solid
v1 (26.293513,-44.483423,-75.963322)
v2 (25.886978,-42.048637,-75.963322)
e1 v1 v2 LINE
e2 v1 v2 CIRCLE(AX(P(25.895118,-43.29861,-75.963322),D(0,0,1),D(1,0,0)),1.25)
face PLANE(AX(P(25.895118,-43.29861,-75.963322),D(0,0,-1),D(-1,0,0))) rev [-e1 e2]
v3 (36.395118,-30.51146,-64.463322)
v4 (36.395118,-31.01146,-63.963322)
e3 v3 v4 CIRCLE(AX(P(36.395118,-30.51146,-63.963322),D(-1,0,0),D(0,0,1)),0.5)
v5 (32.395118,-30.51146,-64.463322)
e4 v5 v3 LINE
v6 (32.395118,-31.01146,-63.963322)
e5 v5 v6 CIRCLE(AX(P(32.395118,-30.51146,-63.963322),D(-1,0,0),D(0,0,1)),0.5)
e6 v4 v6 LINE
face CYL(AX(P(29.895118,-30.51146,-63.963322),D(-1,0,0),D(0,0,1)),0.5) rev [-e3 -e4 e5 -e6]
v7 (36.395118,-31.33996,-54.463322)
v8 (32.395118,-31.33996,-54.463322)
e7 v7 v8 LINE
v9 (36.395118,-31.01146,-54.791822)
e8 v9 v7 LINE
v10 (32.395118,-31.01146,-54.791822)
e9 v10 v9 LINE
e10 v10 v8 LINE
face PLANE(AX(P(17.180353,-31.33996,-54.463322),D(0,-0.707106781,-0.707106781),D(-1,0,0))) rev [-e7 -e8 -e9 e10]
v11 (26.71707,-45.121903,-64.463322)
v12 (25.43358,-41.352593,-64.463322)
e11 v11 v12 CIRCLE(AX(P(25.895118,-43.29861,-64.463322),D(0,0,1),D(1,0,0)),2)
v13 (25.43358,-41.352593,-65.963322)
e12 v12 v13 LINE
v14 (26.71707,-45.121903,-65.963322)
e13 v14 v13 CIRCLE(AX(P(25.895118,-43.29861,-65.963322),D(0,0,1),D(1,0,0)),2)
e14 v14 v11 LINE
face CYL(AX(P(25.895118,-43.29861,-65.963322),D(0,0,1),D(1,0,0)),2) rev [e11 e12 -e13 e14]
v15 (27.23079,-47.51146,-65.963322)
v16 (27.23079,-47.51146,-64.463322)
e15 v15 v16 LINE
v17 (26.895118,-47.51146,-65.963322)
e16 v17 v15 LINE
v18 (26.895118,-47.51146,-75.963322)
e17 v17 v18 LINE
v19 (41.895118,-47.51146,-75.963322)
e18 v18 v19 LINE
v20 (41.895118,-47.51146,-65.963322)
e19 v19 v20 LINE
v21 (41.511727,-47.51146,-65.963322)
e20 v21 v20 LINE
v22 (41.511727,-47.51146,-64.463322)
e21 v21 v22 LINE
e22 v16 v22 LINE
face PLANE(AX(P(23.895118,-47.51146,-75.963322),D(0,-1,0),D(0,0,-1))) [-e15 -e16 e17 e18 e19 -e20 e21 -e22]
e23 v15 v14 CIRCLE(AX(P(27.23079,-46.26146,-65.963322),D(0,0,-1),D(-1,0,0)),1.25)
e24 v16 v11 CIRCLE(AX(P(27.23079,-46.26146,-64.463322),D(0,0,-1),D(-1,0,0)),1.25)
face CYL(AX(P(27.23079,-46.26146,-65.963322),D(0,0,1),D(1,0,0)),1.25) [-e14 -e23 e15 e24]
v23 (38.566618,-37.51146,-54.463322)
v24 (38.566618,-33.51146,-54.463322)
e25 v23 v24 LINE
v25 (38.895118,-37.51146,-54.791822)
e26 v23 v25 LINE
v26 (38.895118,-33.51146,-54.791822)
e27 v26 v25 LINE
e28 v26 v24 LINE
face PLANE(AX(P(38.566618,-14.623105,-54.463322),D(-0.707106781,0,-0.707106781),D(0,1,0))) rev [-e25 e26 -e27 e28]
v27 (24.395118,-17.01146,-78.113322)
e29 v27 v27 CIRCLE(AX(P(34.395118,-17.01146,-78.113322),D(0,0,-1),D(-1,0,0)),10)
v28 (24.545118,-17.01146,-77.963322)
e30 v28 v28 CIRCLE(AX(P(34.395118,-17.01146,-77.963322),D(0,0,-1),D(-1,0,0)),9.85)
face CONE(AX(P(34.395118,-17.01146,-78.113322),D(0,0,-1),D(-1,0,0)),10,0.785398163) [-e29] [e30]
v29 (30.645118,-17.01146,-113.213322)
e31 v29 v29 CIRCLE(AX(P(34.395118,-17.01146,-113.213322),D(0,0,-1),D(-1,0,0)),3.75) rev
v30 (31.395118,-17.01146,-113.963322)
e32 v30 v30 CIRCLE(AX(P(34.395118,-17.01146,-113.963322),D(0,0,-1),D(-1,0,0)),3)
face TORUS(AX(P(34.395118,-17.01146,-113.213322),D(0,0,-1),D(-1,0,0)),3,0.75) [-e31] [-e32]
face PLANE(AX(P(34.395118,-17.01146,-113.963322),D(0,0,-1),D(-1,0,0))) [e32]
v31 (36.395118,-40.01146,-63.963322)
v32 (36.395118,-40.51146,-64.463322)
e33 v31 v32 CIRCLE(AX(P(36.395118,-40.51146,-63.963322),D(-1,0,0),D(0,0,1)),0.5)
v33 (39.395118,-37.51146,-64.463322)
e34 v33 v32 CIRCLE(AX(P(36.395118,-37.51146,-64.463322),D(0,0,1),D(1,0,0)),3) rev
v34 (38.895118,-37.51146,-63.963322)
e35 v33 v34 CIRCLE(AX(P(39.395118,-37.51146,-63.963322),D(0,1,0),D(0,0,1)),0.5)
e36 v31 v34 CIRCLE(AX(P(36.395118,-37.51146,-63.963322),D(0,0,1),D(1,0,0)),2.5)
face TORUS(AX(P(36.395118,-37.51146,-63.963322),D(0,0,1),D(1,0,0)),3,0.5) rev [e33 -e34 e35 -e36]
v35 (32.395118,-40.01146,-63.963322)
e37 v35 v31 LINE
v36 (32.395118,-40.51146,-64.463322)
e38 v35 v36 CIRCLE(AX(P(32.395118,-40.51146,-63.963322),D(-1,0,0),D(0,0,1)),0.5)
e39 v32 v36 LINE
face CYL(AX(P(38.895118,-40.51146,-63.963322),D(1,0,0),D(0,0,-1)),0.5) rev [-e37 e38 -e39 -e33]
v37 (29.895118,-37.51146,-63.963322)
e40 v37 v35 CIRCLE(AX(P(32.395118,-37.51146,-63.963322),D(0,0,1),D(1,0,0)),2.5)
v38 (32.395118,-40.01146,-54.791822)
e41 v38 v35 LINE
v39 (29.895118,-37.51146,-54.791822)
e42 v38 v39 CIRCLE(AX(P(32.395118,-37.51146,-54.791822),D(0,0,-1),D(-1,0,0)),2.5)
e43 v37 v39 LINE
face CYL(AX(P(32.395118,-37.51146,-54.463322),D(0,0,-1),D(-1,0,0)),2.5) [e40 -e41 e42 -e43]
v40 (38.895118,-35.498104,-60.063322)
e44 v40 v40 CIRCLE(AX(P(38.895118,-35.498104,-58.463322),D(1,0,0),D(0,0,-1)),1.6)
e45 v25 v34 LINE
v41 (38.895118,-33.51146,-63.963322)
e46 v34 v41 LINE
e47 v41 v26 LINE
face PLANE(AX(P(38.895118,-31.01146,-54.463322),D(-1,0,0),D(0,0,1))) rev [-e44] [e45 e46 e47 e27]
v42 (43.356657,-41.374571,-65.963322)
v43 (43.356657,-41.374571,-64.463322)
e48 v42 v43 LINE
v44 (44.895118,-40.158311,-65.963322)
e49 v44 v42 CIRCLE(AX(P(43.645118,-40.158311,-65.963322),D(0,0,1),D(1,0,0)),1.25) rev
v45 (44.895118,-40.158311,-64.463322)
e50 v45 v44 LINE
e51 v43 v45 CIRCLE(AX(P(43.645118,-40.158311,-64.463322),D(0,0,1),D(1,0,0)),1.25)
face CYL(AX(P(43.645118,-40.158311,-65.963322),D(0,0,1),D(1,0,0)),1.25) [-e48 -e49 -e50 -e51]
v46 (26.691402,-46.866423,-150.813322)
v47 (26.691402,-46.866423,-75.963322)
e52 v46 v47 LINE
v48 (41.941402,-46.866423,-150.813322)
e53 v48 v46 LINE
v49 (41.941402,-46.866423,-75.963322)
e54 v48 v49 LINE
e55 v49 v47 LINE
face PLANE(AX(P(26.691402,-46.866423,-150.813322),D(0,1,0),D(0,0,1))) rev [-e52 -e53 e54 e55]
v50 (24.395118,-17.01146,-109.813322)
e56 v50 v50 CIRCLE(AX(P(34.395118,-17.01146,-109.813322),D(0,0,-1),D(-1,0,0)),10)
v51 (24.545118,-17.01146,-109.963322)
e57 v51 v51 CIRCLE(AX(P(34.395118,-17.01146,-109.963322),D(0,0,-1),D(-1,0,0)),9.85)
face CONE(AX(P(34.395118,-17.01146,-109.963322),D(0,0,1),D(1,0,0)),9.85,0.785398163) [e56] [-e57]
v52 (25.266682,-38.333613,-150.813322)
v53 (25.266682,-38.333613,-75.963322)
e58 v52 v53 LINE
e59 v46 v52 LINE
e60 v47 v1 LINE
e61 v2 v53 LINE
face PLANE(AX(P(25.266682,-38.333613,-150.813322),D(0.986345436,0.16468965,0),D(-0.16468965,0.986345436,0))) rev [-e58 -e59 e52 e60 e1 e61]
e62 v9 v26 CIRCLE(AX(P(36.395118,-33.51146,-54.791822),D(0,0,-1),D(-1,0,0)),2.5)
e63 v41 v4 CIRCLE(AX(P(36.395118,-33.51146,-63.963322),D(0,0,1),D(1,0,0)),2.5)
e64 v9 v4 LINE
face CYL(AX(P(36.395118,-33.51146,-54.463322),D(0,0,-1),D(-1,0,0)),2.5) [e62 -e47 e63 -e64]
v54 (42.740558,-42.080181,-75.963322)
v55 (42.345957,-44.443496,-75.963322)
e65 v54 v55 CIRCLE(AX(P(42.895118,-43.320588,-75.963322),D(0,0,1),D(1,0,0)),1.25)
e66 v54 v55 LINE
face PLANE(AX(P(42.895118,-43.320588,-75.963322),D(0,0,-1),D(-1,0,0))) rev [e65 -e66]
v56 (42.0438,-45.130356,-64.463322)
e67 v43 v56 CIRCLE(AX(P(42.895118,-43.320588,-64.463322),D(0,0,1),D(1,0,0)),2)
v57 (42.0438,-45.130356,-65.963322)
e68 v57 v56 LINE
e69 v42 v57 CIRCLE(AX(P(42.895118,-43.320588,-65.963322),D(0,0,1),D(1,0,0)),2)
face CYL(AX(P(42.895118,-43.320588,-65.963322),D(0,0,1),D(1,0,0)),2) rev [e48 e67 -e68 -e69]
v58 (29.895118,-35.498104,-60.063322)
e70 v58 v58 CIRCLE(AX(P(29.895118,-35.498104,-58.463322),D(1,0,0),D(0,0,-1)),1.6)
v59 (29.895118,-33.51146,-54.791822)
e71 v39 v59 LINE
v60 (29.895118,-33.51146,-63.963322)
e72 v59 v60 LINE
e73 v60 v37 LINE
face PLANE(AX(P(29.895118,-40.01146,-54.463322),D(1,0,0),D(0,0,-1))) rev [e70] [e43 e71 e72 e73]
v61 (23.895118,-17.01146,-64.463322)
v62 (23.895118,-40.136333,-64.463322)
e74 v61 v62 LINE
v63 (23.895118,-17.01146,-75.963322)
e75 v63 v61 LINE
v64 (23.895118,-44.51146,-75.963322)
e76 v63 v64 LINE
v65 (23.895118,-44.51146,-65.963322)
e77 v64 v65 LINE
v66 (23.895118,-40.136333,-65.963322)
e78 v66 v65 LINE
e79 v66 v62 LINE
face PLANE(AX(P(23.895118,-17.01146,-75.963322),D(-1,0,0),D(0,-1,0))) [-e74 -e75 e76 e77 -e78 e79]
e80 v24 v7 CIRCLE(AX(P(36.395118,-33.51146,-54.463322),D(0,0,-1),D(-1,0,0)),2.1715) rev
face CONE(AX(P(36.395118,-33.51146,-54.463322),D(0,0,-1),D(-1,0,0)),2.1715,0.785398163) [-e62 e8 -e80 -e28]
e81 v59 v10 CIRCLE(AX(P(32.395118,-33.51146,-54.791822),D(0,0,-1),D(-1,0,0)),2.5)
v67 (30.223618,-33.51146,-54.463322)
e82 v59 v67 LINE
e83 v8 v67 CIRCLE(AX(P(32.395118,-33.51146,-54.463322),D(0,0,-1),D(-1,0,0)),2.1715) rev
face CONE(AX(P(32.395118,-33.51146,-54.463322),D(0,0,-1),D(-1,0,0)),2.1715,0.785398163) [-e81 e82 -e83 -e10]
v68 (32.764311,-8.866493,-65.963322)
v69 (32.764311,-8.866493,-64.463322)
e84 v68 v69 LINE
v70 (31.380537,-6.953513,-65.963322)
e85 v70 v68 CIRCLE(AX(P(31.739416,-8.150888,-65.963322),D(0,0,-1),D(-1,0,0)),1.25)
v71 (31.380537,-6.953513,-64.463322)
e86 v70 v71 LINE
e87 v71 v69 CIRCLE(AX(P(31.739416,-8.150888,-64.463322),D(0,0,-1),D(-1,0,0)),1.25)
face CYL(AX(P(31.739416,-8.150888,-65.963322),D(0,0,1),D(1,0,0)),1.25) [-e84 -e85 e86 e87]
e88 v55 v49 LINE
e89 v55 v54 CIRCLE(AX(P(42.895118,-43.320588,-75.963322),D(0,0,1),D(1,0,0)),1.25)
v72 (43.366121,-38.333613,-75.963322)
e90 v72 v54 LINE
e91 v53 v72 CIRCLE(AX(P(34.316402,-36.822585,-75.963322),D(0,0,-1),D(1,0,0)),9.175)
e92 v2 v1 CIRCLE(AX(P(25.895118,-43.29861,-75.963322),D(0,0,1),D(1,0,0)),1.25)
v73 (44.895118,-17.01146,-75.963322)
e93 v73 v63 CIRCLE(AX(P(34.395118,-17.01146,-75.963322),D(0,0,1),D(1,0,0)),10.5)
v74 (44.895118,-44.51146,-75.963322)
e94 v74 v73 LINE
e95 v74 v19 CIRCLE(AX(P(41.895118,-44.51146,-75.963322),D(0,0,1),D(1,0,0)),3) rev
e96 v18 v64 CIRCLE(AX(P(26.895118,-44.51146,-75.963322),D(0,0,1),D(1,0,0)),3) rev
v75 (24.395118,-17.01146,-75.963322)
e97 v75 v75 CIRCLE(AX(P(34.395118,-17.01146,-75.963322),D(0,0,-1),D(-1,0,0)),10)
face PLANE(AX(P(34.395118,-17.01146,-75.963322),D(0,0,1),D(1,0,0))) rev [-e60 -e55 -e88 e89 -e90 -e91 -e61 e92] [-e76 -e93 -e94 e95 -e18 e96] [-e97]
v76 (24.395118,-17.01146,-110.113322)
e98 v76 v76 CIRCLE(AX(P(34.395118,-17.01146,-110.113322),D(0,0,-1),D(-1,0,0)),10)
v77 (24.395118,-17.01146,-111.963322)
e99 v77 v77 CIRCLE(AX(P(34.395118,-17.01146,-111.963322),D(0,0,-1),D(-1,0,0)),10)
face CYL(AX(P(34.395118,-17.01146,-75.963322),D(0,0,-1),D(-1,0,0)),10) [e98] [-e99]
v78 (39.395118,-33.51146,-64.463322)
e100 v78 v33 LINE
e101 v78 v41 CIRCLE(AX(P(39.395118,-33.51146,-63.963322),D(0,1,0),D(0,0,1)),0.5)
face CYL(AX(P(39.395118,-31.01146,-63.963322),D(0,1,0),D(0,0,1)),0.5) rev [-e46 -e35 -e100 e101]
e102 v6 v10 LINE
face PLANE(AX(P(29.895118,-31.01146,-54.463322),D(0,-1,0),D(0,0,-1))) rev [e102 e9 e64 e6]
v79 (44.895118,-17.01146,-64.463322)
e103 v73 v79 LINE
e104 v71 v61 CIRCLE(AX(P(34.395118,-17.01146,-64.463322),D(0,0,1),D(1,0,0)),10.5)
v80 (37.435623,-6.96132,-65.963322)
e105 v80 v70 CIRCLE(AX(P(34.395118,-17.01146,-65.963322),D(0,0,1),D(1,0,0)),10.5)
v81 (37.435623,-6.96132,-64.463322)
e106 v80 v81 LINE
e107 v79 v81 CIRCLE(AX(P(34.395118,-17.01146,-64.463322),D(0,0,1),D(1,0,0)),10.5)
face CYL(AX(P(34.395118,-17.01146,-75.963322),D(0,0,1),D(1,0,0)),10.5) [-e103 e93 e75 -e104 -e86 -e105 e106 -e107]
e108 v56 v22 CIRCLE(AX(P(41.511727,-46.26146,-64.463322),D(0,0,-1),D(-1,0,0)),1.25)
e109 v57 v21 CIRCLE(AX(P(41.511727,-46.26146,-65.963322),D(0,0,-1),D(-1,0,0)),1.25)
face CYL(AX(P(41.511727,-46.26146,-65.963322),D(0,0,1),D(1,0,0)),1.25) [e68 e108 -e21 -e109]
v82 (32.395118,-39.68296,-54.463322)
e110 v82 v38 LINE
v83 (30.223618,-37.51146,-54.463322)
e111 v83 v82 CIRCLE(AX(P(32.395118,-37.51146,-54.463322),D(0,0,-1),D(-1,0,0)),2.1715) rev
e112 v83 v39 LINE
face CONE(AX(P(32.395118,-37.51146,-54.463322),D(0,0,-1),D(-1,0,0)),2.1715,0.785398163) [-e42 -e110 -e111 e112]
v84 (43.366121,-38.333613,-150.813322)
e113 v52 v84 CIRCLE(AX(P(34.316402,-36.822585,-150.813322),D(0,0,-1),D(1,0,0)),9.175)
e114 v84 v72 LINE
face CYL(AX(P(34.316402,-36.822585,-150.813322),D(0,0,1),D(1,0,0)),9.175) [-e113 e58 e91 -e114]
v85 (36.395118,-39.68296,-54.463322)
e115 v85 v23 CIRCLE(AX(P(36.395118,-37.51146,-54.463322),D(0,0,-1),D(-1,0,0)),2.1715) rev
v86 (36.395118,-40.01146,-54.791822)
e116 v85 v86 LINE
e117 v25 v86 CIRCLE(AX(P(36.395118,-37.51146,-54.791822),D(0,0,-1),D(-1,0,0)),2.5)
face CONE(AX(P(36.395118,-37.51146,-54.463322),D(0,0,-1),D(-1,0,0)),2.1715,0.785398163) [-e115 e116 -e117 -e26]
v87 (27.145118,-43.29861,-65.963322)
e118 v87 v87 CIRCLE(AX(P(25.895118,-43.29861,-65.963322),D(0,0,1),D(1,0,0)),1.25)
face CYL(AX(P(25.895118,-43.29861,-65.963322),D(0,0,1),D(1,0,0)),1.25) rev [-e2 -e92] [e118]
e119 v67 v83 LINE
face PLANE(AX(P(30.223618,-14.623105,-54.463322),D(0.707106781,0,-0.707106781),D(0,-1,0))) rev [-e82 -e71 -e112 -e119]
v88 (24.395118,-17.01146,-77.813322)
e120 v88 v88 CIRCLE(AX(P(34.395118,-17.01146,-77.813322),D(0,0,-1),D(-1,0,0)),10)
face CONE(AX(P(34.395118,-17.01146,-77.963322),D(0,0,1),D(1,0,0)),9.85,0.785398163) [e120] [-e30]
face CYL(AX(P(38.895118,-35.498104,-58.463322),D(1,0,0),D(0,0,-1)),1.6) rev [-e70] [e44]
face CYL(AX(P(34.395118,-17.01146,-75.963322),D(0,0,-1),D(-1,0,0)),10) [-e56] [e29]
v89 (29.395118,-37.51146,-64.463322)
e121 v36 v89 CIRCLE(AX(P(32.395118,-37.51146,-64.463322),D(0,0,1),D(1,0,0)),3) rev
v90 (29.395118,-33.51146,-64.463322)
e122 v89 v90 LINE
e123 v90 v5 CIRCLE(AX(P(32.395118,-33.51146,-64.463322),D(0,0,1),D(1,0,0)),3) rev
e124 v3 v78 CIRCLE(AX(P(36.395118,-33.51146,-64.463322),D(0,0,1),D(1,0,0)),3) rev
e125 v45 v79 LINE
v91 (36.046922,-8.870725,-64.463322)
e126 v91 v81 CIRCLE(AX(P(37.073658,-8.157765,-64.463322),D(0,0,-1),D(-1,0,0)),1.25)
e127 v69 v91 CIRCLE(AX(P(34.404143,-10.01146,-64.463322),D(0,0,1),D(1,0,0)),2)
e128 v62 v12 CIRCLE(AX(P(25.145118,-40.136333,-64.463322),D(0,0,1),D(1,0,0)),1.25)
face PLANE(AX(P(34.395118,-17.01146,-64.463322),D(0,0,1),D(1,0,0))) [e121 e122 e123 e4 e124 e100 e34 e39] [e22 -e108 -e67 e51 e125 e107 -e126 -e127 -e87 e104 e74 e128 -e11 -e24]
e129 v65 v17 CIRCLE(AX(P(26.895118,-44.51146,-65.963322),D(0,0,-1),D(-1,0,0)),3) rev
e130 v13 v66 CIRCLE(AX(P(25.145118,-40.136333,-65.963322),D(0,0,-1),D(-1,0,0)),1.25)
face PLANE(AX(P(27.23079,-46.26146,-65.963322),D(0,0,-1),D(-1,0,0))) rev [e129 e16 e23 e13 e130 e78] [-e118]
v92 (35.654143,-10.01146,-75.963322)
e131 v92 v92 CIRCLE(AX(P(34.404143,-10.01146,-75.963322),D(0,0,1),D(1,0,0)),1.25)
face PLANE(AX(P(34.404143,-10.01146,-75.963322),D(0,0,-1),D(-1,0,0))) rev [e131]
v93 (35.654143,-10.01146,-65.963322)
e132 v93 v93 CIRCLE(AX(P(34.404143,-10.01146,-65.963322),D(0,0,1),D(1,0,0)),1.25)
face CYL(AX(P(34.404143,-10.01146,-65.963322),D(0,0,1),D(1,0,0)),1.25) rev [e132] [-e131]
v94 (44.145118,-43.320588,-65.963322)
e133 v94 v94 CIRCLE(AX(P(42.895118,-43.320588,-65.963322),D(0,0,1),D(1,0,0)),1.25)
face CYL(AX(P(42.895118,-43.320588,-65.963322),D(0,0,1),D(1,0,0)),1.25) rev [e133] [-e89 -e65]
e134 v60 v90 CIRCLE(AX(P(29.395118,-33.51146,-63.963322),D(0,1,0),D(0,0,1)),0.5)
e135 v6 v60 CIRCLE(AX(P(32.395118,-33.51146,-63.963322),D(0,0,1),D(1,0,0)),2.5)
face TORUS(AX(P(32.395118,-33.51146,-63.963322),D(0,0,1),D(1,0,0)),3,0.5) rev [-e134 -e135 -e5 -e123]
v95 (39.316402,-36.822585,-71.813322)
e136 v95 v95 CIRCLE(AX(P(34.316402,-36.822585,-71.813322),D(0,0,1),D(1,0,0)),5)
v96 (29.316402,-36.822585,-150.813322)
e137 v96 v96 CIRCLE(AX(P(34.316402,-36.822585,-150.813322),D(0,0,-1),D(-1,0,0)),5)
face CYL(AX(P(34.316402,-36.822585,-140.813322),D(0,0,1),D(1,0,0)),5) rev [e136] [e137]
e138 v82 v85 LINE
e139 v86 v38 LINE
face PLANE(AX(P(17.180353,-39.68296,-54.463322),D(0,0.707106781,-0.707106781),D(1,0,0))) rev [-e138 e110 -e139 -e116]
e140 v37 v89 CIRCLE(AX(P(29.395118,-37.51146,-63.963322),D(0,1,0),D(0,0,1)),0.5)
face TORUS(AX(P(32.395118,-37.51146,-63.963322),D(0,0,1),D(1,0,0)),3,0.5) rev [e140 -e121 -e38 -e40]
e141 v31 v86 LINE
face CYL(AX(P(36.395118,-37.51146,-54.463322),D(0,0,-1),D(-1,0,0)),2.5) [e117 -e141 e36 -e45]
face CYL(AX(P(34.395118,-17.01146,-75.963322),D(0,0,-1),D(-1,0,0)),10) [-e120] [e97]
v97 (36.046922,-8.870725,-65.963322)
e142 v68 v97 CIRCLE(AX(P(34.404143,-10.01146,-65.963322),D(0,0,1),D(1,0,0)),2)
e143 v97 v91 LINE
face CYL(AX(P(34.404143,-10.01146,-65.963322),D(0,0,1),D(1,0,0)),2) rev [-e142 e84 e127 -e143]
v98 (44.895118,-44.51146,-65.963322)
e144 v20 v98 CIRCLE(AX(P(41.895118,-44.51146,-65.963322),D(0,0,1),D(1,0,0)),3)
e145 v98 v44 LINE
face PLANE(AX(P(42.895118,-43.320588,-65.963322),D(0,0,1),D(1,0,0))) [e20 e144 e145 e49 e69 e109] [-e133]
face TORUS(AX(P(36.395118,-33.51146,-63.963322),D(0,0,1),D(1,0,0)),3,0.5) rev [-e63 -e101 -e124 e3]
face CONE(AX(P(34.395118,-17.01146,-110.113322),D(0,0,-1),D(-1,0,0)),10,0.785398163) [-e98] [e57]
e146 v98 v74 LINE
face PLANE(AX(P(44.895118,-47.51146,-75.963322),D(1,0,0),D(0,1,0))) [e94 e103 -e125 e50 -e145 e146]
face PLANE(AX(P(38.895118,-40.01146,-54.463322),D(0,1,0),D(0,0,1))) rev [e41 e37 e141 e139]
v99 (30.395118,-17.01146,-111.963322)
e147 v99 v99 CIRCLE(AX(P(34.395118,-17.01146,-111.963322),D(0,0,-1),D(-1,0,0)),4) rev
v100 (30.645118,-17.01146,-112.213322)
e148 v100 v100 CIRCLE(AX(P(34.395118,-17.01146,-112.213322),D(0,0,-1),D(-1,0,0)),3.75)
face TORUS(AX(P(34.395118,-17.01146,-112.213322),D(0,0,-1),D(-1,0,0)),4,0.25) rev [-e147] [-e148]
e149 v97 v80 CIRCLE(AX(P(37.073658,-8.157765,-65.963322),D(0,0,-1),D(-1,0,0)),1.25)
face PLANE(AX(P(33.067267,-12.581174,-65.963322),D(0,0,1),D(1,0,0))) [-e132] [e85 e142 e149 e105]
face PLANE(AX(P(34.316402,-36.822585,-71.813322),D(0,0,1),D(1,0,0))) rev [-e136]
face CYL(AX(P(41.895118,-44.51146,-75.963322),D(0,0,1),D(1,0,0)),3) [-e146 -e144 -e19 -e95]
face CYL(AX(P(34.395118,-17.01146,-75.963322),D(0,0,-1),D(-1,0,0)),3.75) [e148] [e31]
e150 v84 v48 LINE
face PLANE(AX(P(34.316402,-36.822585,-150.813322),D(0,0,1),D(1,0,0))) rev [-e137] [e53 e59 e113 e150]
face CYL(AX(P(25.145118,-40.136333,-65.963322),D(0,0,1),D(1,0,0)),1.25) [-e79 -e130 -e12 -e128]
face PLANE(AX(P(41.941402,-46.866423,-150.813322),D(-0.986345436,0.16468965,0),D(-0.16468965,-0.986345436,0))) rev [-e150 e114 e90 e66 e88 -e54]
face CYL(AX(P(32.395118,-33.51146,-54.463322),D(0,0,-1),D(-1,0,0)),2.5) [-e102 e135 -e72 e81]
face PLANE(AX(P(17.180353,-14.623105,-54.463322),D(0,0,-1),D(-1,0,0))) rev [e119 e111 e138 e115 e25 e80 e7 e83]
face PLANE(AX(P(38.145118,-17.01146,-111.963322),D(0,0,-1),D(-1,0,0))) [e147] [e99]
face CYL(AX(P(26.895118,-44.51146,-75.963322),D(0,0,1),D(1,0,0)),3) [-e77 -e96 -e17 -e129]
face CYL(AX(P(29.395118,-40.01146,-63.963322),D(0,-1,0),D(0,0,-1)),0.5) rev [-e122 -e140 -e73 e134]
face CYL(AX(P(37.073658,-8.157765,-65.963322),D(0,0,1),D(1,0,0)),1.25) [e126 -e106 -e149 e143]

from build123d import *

# Parameters (mm, degrees)
BOSS_EXTRUDE1_DEPTH            = 23
CUT_EXTRUDE1_DEPTH             = 3
CUT_EXTRUDE2_DEPTH             = 3
CUT_EXTRUDE3_DEPTH             = 3
SKETCH5_W                      = 18
SKETCH5_H                      = 18
BOSS_EXTRUDE2_DEPTH            = 20
BOSS_EXTRUDE3_DEPTH            = 149.7
SKETCH8_W                      = 10
SKETCH8_H                      = 138
F_5_0_5_DIAMETER_HOLE1_D       = 5
F_5_0_5_DIAMETER_HOLE1_DEPTH   = 20
F_6_4_6_4_DIAMETER_HOLE1_D     = 6.4
F_6_4_6_4_DIAMETER_HOLE1_DEPTH = 30
FILLET1_R                      = 5
CHAMFER1_SIZE                  = 0.657
FILLET2_R                      = 0.5
FILLET3_R                      = 1
FILLET4_R                      = 1.5
FILLET5_START                  = -35.454500108
FILLET5_DEPTH                  = 4.454500108
FILLET6_R                      = 6
SKETCH19_R                     = 10
CUT_EXTRUDE4_DEPTH             = 30
SCALE1_SCALE                   = 0.5


with BuildPart() as part:
    # Sketch1 → Boss-Extrude1 (new body)
    with BuildSketch(Plane.XY.offset(-32.454500108)):
        with BuildLine():
            Line((13.42953052, -65.776710579), (55.42953052, -65.776710579))
            Line((55.42953052, -65.776710579), (55.42953052, -4.776710579))
            ThreePointArc((55.42953052, -4.776710579), (34.42953052, 16.223289421), (13.42953052, -4.776710579))
            Line((13.42953052, -4.776710579), (13.42953052, -65.776710579))
        make_face()
    extrude(amount=-BOSS_EXTRUDE1_DEPTH)

    # Sketch2 → Cut-Extrude1 (cut)
    with BuildSketch(Plane.XY.offset(-32.454500108)):
        with BuildLine():
            Line((13.42953052, -57.351010373), (13.42953052, -65.776710579))
            Line((13.42953052, -65.776710579), (20.100874204, -65.776710579))
            ThreePointArc((20.100874204, -65.776710579), (17.656719067, -63.802168161), (19.073434325, -60.997595115))
            ThreePointArc((19.073434325, -60.997595115), (19.600289003, -53.991277109), (13.42953052, -57.351010373))
        make_face()
    extrude(amount=-CUT_EXTRUDE1_DEPTH, mode=Mode.SUBTRACT)

    # Sketch3 → Cut-Extrude2 (cut)
    with BuildSketch(Plane.XY.offset(-32.454500108)):
        with BuildLine():
            Line((55.42953052, -65.776710579), (55.42953052, -57.394966506))
            ThreePointArc((55.42953052, -57.394966506), (49.285998633, -54.017797418), (49.726894996, -61.01450132))
            ThreePointArc((49.726894996, -61.01450132), (51.102575978, -63.821906348), (48.662747793, -65.776710579))
            Line((48.662747793, -65.776710579), (55.42953052, -65.776710579))
        make_face()
    extrude(amount=-CUT_EXTRUDE2_DEPTH, mode=Mode.SUBTRACT)

    # Sketch4 → Cut-Extrude3 (cut)
    with BuildSketch(Plane.XY.offset(-32.454500108)):
        with BuildLine():
            ThreePointArc((28.400368742, 15.33918384), (31.143729281, 14.409675692), (31.167916073, 11.513224857))
            ThreePointArc((31.167916073, 11.513224857), (34.442423035, 5.223292745), (37.733137686, 11.504760638))
            ThreePointArc((37.733137686, 11.504760638), (37.764792889, 14.401139479), (40.510541043, 15.323570788))
            ThreePointArc((40.510541043, 15.323570788), (34.456604769, 16.223271968), (28.400368742, 15.33918384))
        make_face()
    extrude(amount=-CUT_EXTRUDE3_DEPTH, mode=Mode.SUBTRACT)

    # Sketch5 → Boss-Extrude2 (add)
    with BuildSketch(Plane.XY.offset(-32.454500108)):
        with Locations((34.42953052, -41.776710579)):
            Rectangle(SKETCH5_W, SKETCH5_H)
    extrude(amount=BOSS_EXTRUDE2_DEPTH)

    # Sketch6 → Boss-Extrude3 (add)
    with BuildSketch(Plane(origin=(0, 0, -55.454500108), x_dir=(-1, 0, 0), z_dir=(0, 0, -1))):
        with BuildLine():
            Line((-16.172658971, -47.421015636), (-19.022097723, -64.486635224))
            Line((-19.022097723, -64.486635224), (-49.522097723, -64.486635224))
            Line((-49.522097723, -64.486635224), (-52.371536476, -47.421015636))
            ThreePointArc((-52.371536476, -47.421015636), (-34.272097723, -26.048960567), (-16.172658971, -47.421015636))
        make_face()
    extrude(amount=BOSS_EXTRUDE3_DEPTH)

    # Sketch7 → Revolve1 (revolve)
    with BuildSketch(Plane.XZ.offset(4.776710579), mode=Mode.PRIVATE) as revolve1_sk:
        Polygon((54.42953052, -55.454500108), (34.42953052, -55.454500108), (34.42953052, -131.454500108), (41.92953052, -131.454500108), (41.92953052, -127.454500108), (54.42953052, -127.454500108), (54.42953052, -123.754500108), (54.12953052, -123.454500108), (54.42953052, -123.154500108), (54.42953052, -59.754500108), (54.12953052, -59.454500108), (54.42953052, -59.154500108), align=None)
    revolve(revolve1_sk.sketch.rotate(Axis((34.42953052, -4.776710579, -55.454500108), (0, 0, -1)), 180), axis=Axis((34.42953052, -4.776710579, -55.454500108), (0, 0, -1)))

    # Sketch8 → Cut-Revolve1 (revolve, cut)
    with BuildSketch(Plane(origin=(0, -44.398960567, 0), x_dir=(1, 0, 0), z_dir=(0, 1, 0))):
        with Locations((39.272097723, 116.154500108)):
            Rectangle(SKETCH8_W, SKETCH8_H)
    revolve(axis=Axis((34.272097723, -44.398960567, -185.154500108), (0, 0, 1)), mode=Mode.SUBTRACT)

    # Ø5.0 (5) Diameter Hole1
    with Locations(Plane.XY.offset(-35.454500108)):
        with Locations((34.447580034, 9.223289421), (17.42953052, -57.351010373), (51.42953052, -57.394966506)):
            Hole(F_5_0_5_DIAMETER_HOLE1_D / 2, depth=F_5_0_5_DIAMETER_HOLE1_DEPTH)

    # Ø6.4 (6.4) Diameter Hole1
    with Locations(Plane(origin=(43.42953052, 0, 0), x_dir=(0, 0, -1), z_dir=(1, 0, 0))):
        with Locations((20.454500108, -41.749998068)):
            Hole(F_6_4_6_4_DIAMETER_HOLE1_D / 2, depth=F_6_4_6_4_DIAMETER_HOLE1_DEPTH)

    # Fillet1
    fillet1_edges = [part.edges().sort_by_distance(p)[0] for p in [
        (25.42953052, -32.776710579, -22.454500108),
        (25.42953052, -50.776710579, -22.454500108),
        (43.42953052, -50.776710579, -22.454500108),
        (43.42953052, -32.776710579, -22.454500108),
    ]]
    fillet(fillet1_edges, radius=FILLET1_R)

    # Chamfer1
    chamfer1_edges = [part.edges().sort_by_distance(p)[0] for p in [
        (25.42953052, -41.776710579, -12.454500108),
        (34.42953052, -32.776710579, -12.454500108),
        (34.42953052, -50.776710579, -12.454500108),
        (43.42953052, -41.776710579, -12.454500108),
        (41.965064426, -34.241176673, -12.454500108),
        (26.893996615, -49.312244485, -12.454500108),
        (41.965064426, -49.312244485, -12.454500108),
        (26.893996615, -34.241176673, -12.454500108),
    ]]
    chamfer(chamfer1_edges, length=CHAMFER1_SIZE)

    # Fillet2
    fillet2_edges = [part.edges().sort_by_distance(p)[0] for p in [
        (41.92953052, -4.776710579, -127.454500108),
        (24.272097723, -44.398960567, -185.154500108),
    ]]
    fillet(fillet2_edges, radius=FILLET2_R)

    # Fillet3
    fillet3_edges = [part.edges().sort_by_distance(p)[0] for p in [
        (25.42953052, -41.776710579, -32.454500108),
        (34.42953052, -32.776710579, -32.454500108),
        (43.42953052, -41.776710579, -32.454500108),
        (34.42953052, -50.776710579, -32.454500108),
        (26.893996615, -34.241176673, -32.454500108),
        (41.965064426, -49.312244485, -32.454500108),
        (26.893996615, -49.312244485, -32.454500108),
        (41.965064426, -34.241176673, -32.454500108),
    ]]
    fillet(fillet3_edges, radius=FILLET3_R)

    # Fillet4
    fillet4_edges = [part.edges().sort_by_distance(p)[0] for p in [
        (41.92953052, -4.776710579, -131.454500108),
    ]]
    fillet(fillet4_edges, radius=FILLET4_R)

    # Fillet5: read off the stored shape, not the designer's step
    # Fillet5 outline → Fillet5 (cut)
    with BuildSketch(Plane.XY.offset(FILLET5_START)):
        with BuildLine():
            ThreePointArc((16.506453597, -53.45897633), (14.379096338, -52.987616404), (13.42953052, -51.026455053))
            Line((13.42953052, -51.026455053), (13.42953052, -57.351010373))
            ThreePointArc((13.42953052, -57.351010373), (14.291672358, -54.870315681), (16.506453597, -53.45897633))
        make_face()
        with BuildLine():
            ThreePointArc((55.42953052, -51.070411186), (54.479964703, -53.031572537), (52.352607444, -53.502932463))
            ThreePointArc((52.352607444, -53.502932463), (54.567388683, -54.914271815), (55.42953052, -57.394966506))
            Line((55.42953052, -57.394966506), (55.42953052, -51.070411186))
        make_face()
    extrude(amount=FILLET5_DEPTH, mode=Mode.SUBTRACT)

    # Fillet6
    fillet6_edges = [part.edges().sort_by_distance(p)[0] for p in [
        (55.42953052, -65.776710579, -45.454500108),
        (13.42953052, -65.776710579, -45.454500108),
    ]]
    fillet(fillet6_edges, radius=FILLET6_R)

    # Sketch19 → Cut-Extrude4 (cut)
    with BuildSketch(Plane(origin=(0, 0, -205.154500108), x_dir=(-1, 0, 0), z_dir=(0, 0, -1))):
        with Locations(Location((-34.272097723, -44.398960567, 0), (0, 0, 180))):
            Circle(SKETCH19_R)
    extrude(amount=-CUT_EXTRUDE4_DEPTH, mode=Mode.SUBTRACT)


with BuildPart() as part_1:
    # Scale1: scaled about (34.360705618, -29.246210069, -96.472143376)
    add(part.part.scale(SCALE1_SCALE).moved(Location((17.180352809, -14.623105034, -48.236071688))))


solid = part_1.part
